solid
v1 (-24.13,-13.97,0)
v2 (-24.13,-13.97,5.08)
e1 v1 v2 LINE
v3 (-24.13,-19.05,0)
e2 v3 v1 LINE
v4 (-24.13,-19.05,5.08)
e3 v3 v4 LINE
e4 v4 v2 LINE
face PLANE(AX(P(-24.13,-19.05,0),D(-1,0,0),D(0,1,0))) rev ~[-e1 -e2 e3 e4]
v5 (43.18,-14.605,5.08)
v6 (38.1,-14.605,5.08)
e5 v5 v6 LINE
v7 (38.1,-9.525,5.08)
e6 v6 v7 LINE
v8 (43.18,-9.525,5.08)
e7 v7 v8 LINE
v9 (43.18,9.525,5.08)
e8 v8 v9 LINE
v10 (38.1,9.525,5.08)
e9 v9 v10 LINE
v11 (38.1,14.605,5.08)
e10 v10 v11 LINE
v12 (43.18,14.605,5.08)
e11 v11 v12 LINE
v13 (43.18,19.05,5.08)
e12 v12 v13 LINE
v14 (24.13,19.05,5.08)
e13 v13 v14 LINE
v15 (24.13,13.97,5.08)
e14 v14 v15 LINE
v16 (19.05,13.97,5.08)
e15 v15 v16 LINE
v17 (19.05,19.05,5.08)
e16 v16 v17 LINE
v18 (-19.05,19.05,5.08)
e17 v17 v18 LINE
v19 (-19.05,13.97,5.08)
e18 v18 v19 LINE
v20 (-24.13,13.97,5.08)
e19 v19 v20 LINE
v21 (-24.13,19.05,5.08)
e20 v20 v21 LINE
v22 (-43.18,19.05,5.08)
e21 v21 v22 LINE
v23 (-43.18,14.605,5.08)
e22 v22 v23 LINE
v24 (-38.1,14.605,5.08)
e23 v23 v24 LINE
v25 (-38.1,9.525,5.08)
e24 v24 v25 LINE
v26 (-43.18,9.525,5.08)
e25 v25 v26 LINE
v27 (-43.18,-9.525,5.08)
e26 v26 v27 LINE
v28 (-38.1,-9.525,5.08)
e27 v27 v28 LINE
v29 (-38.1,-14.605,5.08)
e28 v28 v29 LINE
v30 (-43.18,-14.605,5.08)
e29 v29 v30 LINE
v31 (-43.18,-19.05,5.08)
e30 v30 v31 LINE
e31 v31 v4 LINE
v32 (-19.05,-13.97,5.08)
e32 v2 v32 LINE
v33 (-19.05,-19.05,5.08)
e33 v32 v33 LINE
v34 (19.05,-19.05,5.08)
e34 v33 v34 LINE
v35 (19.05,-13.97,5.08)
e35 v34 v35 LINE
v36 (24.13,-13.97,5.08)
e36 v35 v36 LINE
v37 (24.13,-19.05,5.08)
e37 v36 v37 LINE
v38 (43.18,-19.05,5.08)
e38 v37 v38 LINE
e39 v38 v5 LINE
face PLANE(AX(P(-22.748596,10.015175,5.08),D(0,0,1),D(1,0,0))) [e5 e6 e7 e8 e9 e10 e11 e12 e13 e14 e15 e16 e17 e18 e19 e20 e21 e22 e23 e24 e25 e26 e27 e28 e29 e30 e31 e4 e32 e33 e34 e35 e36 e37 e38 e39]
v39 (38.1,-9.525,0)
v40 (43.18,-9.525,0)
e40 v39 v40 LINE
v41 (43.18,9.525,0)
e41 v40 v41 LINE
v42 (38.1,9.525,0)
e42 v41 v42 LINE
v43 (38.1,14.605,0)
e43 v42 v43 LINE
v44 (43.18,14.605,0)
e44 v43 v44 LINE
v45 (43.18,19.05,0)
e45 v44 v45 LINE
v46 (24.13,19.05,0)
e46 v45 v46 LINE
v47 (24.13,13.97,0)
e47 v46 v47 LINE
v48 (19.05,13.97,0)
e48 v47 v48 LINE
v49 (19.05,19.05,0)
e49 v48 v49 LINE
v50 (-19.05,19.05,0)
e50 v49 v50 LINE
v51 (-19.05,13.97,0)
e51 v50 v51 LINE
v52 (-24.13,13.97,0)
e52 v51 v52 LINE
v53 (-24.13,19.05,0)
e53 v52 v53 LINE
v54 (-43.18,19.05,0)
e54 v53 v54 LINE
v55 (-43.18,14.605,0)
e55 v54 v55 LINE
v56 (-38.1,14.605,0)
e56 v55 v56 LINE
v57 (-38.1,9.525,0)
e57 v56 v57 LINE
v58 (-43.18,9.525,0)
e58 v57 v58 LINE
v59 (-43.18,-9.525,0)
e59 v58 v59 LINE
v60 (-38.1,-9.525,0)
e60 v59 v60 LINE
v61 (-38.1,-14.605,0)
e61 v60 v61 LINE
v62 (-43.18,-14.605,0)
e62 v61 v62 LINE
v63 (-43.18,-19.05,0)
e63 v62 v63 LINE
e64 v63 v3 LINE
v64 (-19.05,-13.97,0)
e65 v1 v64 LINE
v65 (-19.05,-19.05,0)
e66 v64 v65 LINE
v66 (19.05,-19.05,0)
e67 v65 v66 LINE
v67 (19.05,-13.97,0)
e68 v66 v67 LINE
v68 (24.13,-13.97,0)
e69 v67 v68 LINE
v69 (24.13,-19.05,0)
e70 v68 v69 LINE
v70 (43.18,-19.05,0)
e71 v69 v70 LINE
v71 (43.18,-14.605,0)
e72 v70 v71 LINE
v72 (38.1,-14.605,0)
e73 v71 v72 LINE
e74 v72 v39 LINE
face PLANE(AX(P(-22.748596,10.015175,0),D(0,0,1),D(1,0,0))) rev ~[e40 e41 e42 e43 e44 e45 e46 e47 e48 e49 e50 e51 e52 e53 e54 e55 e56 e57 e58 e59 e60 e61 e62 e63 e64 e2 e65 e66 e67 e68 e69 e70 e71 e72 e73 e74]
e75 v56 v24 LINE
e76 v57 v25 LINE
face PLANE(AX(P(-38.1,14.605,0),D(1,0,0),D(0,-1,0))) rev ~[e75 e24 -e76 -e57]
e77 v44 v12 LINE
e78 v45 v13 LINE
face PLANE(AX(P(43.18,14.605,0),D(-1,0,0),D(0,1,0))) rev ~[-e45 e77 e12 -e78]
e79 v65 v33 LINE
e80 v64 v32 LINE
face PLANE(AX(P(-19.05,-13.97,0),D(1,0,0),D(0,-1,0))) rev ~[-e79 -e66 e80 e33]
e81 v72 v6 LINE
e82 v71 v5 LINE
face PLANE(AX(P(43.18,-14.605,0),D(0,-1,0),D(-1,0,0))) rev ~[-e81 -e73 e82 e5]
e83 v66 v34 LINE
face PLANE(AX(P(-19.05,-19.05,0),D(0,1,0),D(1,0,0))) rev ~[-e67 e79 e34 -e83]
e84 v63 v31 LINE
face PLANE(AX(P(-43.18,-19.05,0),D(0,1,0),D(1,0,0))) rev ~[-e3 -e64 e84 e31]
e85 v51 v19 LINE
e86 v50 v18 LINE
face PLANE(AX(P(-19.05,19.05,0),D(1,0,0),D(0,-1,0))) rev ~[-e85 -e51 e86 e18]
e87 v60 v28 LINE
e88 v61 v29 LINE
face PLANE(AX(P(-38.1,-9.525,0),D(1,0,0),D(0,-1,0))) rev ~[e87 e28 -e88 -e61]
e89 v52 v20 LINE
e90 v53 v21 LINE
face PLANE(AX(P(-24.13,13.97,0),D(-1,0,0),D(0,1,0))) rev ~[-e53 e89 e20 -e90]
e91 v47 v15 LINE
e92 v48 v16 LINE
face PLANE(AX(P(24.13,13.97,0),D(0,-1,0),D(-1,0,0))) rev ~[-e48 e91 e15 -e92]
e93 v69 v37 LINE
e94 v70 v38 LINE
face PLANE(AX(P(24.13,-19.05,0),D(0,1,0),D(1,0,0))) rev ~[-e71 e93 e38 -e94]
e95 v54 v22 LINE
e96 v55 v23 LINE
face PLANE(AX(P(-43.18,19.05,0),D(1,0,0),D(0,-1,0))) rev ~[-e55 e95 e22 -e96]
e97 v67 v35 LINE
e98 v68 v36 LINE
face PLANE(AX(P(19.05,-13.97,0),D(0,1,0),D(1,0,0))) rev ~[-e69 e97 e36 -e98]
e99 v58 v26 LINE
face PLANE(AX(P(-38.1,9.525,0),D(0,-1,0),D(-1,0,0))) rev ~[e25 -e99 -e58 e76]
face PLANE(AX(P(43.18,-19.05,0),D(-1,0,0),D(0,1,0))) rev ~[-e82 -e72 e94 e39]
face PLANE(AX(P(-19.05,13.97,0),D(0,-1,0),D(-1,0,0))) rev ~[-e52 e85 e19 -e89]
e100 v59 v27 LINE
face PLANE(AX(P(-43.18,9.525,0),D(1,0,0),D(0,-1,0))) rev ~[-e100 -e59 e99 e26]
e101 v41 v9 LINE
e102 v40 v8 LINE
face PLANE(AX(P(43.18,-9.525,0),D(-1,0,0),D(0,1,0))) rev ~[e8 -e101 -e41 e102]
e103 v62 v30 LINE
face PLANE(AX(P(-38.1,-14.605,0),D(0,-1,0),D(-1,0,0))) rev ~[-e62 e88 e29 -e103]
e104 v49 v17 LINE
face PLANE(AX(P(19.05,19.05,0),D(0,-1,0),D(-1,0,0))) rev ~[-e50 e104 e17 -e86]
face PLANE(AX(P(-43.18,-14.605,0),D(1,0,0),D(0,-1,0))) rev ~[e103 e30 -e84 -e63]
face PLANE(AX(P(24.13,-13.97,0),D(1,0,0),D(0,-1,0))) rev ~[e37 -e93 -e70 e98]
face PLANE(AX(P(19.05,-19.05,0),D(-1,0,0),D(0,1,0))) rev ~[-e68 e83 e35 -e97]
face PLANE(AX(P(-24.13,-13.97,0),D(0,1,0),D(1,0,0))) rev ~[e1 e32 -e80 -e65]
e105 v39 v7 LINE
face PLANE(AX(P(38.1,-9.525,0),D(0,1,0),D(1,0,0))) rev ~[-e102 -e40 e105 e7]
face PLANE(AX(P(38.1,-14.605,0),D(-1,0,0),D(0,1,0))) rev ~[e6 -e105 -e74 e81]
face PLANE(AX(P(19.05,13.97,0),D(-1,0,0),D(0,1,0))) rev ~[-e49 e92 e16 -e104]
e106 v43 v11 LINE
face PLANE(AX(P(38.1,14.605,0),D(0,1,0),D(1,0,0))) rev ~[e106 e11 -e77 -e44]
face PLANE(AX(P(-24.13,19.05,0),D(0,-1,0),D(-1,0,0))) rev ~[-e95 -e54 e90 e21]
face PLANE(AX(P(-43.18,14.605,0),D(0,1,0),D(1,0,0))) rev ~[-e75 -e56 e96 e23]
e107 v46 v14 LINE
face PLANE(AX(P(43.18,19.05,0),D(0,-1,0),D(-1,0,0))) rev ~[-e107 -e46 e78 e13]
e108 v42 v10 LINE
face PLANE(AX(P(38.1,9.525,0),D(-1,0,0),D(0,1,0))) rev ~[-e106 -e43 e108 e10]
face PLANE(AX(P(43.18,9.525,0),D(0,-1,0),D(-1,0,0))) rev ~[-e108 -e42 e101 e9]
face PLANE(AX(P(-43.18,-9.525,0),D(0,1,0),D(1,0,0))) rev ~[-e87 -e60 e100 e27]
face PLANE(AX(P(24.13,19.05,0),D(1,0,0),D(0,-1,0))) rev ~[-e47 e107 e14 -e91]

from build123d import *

# Parameters (mm, degrees)
F1_DEPTH = 5.08


# Not quite as in the source:
# - a feature names something its author has since deleted; it is built from what else it names


with BuildPart() as f1:
    # F0 (on Top) → F1 (new body)
    with BuildSketch(Plane.XY):
        Polygon((-43.18, 9.525), (-43.18, 0), (0, 0), (0, 19.05), (-19.05, 19.05), (-19.05, 13.97), (-24.13, 13.97), (-24.13, 19.05), (-38.1, 19.05), (-43.18, 19.05), (-43.18, 14.605), (-38.1, 14.605), (-38.1, 9.525), align=None)
        Polygon((-43.18, -14.605), (-43.18, -19.05), (-24.13, -19.05), (-24.13, -13.97), (-19.05, -13.97), (-19.05, -19.05), (19.05, -19.05), (19.05, -13.97), (24.13, -13.97), (24.13, -19.05), (43.18, -19.05), (43.18, -14.605), (38.1, -14.605), (38.1, -9.525), (43.18, -9.525), (43.18, 0), (0, 0), (-43.18, 0), (-43.18, -9.525), (-38.1, -9.525), (-38.1, -14.605), align=None)
        Polygon((0, 19.05), (0, 0), (43.18, 0), (43.18, 9.525), (38.1, 9.525), (38.1, 14.605), (43.18, 14.605), (43.18, 19.05), (38.1, 19.05), (24.13, 19.05), (24.13, 13.97), (19.05, 13.97), (19.05, 19.05), align=None)
    extrude(amount=F1_DEPTH)


solid = f1.part
